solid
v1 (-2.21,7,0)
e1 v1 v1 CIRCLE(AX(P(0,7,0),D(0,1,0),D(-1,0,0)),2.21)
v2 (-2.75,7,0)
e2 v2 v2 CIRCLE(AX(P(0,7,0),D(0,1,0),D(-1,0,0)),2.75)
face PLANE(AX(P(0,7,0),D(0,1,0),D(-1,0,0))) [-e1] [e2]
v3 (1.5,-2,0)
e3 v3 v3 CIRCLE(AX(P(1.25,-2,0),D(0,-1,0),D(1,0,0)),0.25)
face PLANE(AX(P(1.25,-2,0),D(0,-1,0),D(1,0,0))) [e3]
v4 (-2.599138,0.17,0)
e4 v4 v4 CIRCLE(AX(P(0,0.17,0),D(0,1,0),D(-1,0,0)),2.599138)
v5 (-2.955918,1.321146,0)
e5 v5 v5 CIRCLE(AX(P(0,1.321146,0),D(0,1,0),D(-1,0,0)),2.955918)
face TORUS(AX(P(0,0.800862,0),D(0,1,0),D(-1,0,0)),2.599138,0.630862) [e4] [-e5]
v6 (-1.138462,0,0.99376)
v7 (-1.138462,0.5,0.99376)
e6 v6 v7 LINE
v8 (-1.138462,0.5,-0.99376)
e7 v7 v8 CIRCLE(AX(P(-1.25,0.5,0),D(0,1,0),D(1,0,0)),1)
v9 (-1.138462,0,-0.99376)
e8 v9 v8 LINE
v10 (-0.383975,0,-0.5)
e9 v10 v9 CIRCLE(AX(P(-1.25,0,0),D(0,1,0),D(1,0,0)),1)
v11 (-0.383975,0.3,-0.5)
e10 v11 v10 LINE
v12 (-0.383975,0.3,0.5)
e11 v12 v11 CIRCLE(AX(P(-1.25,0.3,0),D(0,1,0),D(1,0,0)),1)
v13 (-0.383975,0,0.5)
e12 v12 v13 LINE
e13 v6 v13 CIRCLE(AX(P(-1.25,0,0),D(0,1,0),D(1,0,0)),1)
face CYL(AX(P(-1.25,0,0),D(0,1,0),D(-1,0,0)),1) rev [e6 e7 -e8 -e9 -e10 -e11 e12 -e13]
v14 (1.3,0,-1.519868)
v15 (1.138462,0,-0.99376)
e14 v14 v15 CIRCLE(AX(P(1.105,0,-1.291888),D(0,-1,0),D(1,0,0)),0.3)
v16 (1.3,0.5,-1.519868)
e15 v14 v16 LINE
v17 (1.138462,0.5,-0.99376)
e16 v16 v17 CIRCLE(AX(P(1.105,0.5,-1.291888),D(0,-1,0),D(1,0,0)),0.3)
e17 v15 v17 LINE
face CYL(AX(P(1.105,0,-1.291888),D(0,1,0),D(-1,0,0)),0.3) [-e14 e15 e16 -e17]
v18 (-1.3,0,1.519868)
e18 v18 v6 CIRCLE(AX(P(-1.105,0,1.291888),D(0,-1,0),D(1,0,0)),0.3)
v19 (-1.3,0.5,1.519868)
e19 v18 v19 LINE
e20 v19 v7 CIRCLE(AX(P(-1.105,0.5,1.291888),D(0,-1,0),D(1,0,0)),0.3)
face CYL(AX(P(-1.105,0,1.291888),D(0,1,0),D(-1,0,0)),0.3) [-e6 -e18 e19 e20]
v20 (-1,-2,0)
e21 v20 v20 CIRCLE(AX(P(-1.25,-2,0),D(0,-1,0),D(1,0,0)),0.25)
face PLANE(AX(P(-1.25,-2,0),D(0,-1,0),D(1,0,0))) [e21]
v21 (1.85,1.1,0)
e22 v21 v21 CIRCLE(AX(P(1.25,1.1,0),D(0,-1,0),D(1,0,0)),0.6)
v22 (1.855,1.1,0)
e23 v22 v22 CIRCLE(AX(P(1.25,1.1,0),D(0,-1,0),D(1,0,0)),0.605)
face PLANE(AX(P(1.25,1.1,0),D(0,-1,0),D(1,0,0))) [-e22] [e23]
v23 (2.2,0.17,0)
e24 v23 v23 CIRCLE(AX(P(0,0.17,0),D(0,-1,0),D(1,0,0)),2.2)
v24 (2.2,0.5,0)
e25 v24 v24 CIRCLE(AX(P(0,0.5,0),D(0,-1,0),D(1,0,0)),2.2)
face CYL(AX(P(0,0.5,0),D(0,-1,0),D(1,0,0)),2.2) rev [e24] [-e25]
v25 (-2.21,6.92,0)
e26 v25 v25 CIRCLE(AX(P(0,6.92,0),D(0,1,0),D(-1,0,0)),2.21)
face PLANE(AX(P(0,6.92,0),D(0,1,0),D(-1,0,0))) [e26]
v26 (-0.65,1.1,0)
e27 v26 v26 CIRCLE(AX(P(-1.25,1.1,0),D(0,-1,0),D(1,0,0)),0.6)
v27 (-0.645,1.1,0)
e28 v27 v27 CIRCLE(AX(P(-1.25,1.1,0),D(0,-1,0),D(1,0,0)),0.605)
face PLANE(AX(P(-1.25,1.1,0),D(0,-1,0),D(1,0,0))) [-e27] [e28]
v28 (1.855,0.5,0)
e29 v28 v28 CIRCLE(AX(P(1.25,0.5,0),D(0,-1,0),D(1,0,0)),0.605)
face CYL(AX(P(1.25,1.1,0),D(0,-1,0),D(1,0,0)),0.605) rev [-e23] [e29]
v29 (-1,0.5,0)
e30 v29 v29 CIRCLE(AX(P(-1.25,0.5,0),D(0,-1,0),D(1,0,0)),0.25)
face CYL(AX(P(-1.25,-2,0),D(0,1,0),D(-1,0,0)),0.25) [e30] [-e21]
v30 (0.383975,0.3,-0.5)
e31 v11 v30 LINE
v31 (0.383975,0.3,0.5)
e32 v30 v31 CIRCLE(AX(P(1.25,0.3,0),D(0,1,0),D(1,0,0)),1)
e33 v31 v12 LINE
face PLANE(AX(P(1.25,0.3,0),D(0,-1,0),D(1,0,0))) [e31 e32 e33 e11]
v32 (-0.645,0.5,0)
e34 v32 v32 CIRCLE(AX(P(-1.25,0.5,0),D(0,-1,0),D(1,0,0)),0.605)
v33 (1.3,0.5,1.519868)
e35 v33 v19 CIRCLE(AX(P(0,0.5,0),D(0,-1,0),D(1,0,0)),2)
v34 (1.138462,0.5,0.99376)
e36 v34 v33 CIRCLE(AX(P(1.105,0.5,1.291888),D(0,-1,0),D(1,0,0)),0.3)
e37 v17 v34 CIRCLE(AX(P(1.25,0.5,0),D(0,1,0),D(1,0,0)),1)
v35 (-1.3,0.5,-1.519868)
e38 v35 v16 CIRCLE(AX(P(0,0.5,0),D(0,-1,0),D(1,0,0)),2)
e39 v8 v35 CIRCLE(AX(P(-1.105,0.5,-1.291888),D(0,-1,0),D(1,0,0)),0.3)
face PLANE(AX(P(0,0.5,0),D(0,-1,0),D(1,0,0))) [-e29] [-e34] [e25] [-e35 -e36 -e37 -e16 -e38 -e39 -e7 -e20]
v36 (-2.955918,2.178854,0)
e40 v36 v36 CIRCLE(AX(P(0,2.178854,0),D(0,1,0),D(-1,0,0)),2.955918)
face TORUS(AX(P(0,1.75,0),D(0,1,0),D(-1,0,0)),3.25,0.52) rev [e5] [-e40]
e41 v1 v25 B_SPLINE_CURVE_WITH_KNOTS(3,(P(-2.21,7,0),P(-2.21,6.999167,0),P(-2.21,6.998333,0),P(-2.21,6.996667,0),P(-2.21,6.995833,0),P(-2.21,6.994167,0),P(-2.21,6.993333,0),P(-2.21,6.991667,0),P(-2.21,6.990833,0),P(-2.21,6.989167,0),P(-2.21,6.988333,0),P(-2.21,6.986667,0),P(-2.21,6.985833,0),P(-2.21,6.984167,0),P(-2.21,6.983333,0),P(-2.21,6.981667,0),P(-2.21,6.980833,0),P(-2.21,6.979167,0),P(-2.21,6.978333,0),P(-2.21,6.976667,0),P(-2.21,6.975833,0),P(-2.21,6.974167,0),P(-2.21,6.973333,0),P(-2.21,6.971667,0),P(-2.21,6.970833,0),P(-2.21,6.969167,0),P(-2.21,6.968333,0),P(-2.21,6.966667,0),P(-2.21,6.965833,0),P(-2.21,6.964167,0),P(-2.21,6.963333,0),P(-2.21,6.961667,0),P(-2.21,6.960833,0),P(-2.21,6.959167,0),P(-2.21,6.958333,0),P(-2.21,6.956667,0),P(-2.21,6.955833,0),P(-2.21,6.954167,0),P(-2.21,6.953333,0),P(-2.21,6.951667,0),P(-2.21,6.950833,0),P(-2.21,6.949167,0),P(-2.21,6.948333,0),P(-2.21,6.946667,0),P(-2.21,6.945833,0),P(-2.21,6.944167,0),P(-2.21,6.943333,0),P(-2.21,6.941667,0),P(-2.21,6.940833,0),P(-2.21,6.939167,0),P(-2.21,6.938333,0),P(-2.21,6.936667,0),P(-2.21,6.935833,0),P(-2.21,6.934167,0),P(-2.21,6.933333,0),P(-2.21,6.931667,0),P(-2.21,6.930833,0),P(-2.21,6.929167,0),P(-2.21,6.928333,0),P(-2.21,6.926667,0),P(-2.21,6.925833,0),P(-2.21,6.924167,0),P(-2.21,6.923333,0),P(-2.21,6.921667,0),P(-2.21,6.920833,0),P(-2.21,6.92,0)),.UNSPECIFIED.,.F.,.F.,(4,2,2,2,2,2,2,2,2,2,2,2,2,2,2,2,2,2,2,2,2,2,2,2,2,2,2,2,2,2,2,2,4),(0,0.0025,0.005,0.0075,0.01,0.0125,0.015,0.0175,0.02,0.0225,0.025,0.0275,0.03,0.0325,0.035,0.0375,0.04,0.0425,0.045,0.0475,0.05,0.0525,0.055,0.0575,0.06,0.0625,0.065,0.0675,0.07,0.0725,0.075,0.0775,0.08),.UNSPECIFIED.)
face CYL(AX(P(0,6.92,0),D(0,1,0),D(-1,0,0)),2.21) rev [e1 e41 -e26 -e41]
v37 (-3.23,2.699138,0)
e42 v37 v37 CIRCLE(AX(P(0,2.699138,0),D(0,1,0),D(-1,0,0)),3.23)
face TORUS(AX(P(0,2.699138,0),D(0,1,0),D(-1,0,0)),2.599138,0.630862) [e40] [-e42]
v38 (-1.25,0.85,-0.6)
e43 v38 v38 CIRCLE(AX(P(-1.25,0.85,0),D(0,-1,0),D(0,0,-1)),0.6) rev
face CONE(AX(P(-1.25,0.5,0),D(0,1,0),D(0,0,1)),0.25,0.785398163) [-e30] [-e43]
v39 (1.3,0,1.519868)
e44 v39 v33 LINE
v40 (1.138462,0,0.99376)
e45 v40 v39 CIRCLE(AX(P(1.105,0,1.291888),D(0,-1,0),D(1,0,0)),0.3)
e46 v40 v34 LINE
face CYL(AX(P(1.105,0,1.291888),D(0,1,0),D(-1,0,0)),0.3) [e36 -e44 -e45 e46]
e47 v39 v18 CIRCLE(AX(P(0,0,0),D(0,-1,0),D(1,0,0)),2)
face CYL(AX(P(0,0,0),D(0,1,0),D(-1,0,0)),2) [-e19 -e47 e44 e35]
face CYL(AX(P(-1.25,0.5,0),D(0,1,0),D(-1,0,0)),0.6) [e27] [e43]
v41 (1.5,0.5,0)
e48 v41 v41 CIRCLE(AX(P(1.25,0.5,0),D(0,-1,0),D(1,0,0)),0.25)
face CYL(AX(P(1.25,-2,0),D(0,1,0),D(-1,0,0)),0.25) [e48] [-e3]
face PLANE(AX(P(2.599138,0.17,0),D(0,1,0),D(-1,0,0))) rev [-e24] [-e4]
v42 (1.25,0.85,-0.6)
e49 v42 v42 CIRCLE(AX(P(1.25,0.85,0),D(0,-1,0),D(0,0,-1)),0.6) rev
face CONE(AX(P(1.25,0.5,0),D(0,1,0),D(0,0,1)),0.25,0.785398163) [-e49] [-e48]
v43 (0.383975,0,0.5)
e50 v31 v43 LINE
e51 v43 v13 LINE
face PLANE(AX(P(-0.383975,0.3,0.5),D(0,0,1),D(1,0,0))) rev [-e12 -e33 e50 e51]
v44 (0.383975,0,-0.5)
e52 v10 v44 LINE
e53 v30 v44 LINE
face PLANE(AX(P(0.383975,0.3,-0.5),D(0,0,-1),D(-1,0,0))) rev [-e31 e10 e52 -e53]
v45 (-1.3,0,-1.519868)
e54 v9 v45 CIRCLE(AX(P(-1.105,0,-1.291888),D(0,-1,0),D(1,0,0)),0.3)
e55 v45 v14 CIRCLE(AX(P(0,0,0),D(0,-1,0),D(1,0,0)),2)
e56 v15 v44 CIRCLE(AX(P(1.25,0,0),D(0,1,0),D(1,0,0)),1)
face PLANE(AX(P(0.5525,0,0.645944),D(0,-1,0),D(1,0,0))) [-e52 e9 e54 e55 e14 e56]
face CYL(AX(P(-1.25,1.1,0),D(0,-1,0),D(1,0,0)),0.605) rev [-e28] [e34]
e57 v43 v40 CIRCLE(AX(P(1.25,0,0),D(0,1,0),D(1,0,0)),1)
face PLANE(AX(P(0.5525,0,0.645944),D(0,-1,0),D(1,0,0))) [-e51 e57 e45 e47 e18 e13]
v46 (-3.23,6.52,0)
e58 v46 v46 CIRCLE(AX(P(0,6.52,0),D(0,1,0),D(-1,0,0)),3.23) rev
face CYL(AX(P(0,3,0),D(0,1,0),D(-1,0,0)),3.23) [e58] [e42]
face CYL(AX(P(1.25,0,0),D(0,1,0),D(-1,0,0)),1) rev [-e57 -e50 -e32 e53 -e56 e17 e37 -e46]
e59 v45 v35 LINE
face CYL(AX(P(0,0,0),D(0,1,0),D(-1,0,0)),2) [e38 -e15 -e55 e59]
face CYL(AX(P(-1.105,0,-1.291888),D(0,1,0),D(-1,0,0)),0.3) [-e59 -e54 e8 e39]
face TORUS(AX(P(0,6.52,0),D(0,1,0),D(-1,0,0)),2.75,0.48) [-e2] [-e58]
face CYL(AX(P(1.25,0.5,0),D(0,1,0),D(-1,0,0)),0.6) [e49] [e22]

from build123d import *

# Parameters (mm, degrees)
SKETCH4_R              = 2.2
CUT_EXTRUDE1_DEPTH     = 0.33
BOSS_EXTRUDE1_DEPTH    = 0.5
CUT_EXTRUDE2_START     = -0.3
CUT_EXTRUDE2_DEPTH     = 0.3
SKETCH7_R              = 0.605
CUT_EXTRUDE3_DEPTH     = 0.6
SKETCH8_R              = 0.6
BOSS_EXTRUDE2_DEPTH    = 0.6
CHAMFER1_SIZE          = 0.35
SKETCH9_R              = 0.25
BOSS_EXTRUDE3_DEPTH    = 2.5
SKETCH10_R             = 3.23
BOSS_EXTRUDE4_DEPTH    = 4
FILLET1_R              = 0.48
SKETCH11_R             = 2.21
CUT_EXTRUDE4_DEPTH     = 0.08
SPLIT1_SURFACE_1_BACK  = 13.824
SPLIT1_SURFACE_1_DEPTH = 27.648
SPLIT1_SURFACE_2_BACK  = 13.824
SPLIT1_SURFACE_2_DEPTH = 27.648


with BuildPart() as part:
    # Sketch3 → Revolve1 (revolve)
    with BuildSketch(Plane.XY, mode=Mode.PRIVATE) as revolve1_sk:
        with BuildLine():
            Line((2.599137675, 0.17), (0, 0.17))
            Line((0, 0.17), (0, 3))
            Line((0, 3), (3.23, 3))
            Line((3.23, 3), (3.23, 2.699137675))
            ThreePointArc((3.23, 2.699137675), (3.157289203, 2.405106817), (2.955917553, 2.178853721))
            ThreePointArc((2.955917553, 2.178853721), (2.73, 1.75), (2.955917553, 1.321146279))
            ThreePointArc((2.955917553, 1.321146279), (3.201721618, 0.614100808), (2.599137675, 0.17))
        make_face()
    revolve(revolve1_sk.sketch.rotate(Axis((0, 3, 0), (0, -1, 0)), 180), axis=Axis((0, 3, 0), (0, -1, 0)))

    # Sketch4 → Cut-Extrude1 (cut)
    with BuildSketch(Plane.XZ.offset(-0.17)):
        Circle(SKETCH4_R)
    extrude(amount=-CUT_EXTRUDE1_DEPTH, mode=Mode.SUBTRACT)

    # Sketch5 → Boss-Extrude1 (add)
    with BuildSketch(Plane.XZ.offset(-0.5)):
        with BuildLine():
            ThreePointArc((1.3, 1.519868415), (0, 2), (-1.3, 1.519868415))
            ThreePointArc((-1.3, 1.519868415), (-1.391785902, 1.203832227), (-1.138461538, 0.993760118))
            ThreePointArc((-1.138461538, 0.993760118), (-0.25, 0), (-1.138461538, -0.993760118))
            ThreePointArc((-1.138461538, -0.993760118), (-1.391785902, -1.203832227), (-1.3, -1.519868415))
            ThreePointArc((-1.3, -1.519868415), (0, -2), (1.3, -1.519868415))
            ThreePointArc((1.3, -1.519868415), (1.391785902, -1.203832227), (1.138461538, -0.993760118))
            ThreePointArc((1.138461538, -0.993760118), (0.25, 0), (1.138461538, 0.993760118))
            ThreePointArc((1.138461538, 0.993760118), (1.391785902, 1.203832227), (1.3, 1.519868415))
        make_face()
    extrude(amount=BOSS_EXTRUDE1_DEPTH)

    # Sketch6 → Cut-Extrude2 (cut)
    with BuildSketch(Plane.XZ.offset(CUT_EXTRUDE2_START)):
        with BuildLine():
            Line((0.383974596, -0.5), (-0.383974596, -0.5))
            ThreePointArc((-0.383974596, -0.5), (-0.25, 0), (-0.383974596, 0.5))
            Line((-0.383974596, 0.5), (0.383974596, 0.5))
            ThreePointArc((0.383974596, 0.5), (0.25, 0), (0.383974596, -0.5))
        make_face()
    extrude(amount=CUT_EXTRUDE2_DEPTH, mode=Mode.SUBTRACT)

    # Sketch7 → Cut-Extrude3 (cut)
    with BuildSketch(Plane.XZ.offset(-0.5)):
        with Locations((-1.25, 0)):
            Circle(SKETCH7_R)
        with Locations((1.25, 0)):
            Circle(SKETCH7_R)
    extrude(amount=-CUT_EXTRUDE3_DEPTH, mode=Mode.SUBTRACT)

    # Sketch8 → Boss-Extrude2 (add)
    with BuildSketch(Plane.XZ.offset(-1.1)):
        with Locations((-1.25, 0)):
            Circle(SKETCH8_R)
        with Locations((1.25, 0)):
            Circle(SKETCH8_R)
    extrude(amount=BOSS_EXTRUDE2_DEPTH)

    # Chamfer1
    chamfer1_edges = [part.edges().sort_by_distance(p)[0] for p in [
        (-1.85, 0.5, 0),
        (0.65, 0.5, 0),
    ]]
    chamfer(chamfer1_edges, length=CHAMFER1_SIZE)

    # Sketch9 → Boss-Extrude3 (add)
    with BuildSketch(Plane.XZ.offset(-0.5)):
        with Locations((-1.25, 0)):
            Circle(SKETCH9_R)
        with Locations((1.25, 0)):
            Circle(SKETCH9_R)
    extrude(amount=BOSS_EXTRUDE3_DEPTH)

    # Sketch10 → Boss-Extrude4 (add)
    with BuildSketch(Plane(origin=(0, 3, 0), x_dir=(1, 0, 0), z_dir=(0, 1, 0))):
        with Locations(Location((0, 0, 0), (0, 0, 180))):
            Circle(SKETCH10_R)
    extrude(amount=BOSS_EXTRUDE4_DEPTH)

    # Fillet1
    fillet1_edges = [part.edges().sort_by_distance(p)[0] for p in [
        (3.23, 7, 0),
    ]]
    fillet(fillet1_edges, radius=FILLET1_R)

    # Sketch11 → Cut-Extrude4 (cut)
    with BuildSketch(Plane(origin=(0, 7, 0), x_dir=(1, 0, 0), z_dir=(0, 1, 0))):
        with Locations(Location((0, 0, 0), (0, 0, 180))):
            Circle(SKETCH11_R)
    extrude(amount=-CUT_EXTRUDE4_DEPTH, mode=Mode.SUBTRACT)


with BuildPart() as body_2:
    # Split1: the piece behind the surface
    add(part.part)
    # Split1 surface: a surface, the sketch's curves swept straight by 27.648 mm
    with BuildLine(Plane(origin=(5, 0, 0), x_dir=(0, 0, -1), z_dir=(1, 0, 0)).offset(-SPLIT1_SURFACE_1_BACK), mode=Mode.PRIVATE) as split1_surface_1_path:
        Line((-1, 0), (1, 0))
        Line((1, 0), (1, 7))
        Line((1, 7), (-1, 7))
        Line((-1, 7), (-1, 0))
    split1_surface_1 = Shell.extrude(split1_surface_1_path.wire(), (1 * SPLIT1_SURFACE_1_DEPTH, 0 * SPLIT1_SURFACE_1_DEPTH, 0 * SPLIT1_SURFACE_1_DEPTH))
    split(bisect_by=split1_surface_1, keep=Keep.BOTTOM)


with BuildPart() as part_1:
    add(part.part)

    # Split1: split by a surface, the side it looks to stays
    # Split1 surface: a surface, the sketch's curves swept straight by 27.648 mm
    with BuildLine(Plane(origin=(5, 0, 0), x_dir=(0, 0, -1), z_dir=(1, 0, 0)).offset(-SPLIT1_SURFACE_2_BACK), mode=Mode.PRIVATE) as split1_surface_2_path:
        Line((-1, 0), (1, 0))
        Line((1, 0), (1, 7))
        Line((1, 7), (-1, 7))
        Line((-1, 7), (-1, 0))
    split1_surface_2 = Shell.extrude(split1_surface_2_path.wire(), (1 * SPLIT1_SURFACE_2_DEPTH, 0 * SPLIT1_SURFACE_2_DEPTH, 0 * SPLIT1_SURFACE_2_DEPTH))
    split(bisect_by=split1_surface_2, keep=Keep.TOP)

    # Combine1: read off the stored shape, not the designer's step
    # Combine1: union body 2
    add(body_2.part)


solid = part_1.part
